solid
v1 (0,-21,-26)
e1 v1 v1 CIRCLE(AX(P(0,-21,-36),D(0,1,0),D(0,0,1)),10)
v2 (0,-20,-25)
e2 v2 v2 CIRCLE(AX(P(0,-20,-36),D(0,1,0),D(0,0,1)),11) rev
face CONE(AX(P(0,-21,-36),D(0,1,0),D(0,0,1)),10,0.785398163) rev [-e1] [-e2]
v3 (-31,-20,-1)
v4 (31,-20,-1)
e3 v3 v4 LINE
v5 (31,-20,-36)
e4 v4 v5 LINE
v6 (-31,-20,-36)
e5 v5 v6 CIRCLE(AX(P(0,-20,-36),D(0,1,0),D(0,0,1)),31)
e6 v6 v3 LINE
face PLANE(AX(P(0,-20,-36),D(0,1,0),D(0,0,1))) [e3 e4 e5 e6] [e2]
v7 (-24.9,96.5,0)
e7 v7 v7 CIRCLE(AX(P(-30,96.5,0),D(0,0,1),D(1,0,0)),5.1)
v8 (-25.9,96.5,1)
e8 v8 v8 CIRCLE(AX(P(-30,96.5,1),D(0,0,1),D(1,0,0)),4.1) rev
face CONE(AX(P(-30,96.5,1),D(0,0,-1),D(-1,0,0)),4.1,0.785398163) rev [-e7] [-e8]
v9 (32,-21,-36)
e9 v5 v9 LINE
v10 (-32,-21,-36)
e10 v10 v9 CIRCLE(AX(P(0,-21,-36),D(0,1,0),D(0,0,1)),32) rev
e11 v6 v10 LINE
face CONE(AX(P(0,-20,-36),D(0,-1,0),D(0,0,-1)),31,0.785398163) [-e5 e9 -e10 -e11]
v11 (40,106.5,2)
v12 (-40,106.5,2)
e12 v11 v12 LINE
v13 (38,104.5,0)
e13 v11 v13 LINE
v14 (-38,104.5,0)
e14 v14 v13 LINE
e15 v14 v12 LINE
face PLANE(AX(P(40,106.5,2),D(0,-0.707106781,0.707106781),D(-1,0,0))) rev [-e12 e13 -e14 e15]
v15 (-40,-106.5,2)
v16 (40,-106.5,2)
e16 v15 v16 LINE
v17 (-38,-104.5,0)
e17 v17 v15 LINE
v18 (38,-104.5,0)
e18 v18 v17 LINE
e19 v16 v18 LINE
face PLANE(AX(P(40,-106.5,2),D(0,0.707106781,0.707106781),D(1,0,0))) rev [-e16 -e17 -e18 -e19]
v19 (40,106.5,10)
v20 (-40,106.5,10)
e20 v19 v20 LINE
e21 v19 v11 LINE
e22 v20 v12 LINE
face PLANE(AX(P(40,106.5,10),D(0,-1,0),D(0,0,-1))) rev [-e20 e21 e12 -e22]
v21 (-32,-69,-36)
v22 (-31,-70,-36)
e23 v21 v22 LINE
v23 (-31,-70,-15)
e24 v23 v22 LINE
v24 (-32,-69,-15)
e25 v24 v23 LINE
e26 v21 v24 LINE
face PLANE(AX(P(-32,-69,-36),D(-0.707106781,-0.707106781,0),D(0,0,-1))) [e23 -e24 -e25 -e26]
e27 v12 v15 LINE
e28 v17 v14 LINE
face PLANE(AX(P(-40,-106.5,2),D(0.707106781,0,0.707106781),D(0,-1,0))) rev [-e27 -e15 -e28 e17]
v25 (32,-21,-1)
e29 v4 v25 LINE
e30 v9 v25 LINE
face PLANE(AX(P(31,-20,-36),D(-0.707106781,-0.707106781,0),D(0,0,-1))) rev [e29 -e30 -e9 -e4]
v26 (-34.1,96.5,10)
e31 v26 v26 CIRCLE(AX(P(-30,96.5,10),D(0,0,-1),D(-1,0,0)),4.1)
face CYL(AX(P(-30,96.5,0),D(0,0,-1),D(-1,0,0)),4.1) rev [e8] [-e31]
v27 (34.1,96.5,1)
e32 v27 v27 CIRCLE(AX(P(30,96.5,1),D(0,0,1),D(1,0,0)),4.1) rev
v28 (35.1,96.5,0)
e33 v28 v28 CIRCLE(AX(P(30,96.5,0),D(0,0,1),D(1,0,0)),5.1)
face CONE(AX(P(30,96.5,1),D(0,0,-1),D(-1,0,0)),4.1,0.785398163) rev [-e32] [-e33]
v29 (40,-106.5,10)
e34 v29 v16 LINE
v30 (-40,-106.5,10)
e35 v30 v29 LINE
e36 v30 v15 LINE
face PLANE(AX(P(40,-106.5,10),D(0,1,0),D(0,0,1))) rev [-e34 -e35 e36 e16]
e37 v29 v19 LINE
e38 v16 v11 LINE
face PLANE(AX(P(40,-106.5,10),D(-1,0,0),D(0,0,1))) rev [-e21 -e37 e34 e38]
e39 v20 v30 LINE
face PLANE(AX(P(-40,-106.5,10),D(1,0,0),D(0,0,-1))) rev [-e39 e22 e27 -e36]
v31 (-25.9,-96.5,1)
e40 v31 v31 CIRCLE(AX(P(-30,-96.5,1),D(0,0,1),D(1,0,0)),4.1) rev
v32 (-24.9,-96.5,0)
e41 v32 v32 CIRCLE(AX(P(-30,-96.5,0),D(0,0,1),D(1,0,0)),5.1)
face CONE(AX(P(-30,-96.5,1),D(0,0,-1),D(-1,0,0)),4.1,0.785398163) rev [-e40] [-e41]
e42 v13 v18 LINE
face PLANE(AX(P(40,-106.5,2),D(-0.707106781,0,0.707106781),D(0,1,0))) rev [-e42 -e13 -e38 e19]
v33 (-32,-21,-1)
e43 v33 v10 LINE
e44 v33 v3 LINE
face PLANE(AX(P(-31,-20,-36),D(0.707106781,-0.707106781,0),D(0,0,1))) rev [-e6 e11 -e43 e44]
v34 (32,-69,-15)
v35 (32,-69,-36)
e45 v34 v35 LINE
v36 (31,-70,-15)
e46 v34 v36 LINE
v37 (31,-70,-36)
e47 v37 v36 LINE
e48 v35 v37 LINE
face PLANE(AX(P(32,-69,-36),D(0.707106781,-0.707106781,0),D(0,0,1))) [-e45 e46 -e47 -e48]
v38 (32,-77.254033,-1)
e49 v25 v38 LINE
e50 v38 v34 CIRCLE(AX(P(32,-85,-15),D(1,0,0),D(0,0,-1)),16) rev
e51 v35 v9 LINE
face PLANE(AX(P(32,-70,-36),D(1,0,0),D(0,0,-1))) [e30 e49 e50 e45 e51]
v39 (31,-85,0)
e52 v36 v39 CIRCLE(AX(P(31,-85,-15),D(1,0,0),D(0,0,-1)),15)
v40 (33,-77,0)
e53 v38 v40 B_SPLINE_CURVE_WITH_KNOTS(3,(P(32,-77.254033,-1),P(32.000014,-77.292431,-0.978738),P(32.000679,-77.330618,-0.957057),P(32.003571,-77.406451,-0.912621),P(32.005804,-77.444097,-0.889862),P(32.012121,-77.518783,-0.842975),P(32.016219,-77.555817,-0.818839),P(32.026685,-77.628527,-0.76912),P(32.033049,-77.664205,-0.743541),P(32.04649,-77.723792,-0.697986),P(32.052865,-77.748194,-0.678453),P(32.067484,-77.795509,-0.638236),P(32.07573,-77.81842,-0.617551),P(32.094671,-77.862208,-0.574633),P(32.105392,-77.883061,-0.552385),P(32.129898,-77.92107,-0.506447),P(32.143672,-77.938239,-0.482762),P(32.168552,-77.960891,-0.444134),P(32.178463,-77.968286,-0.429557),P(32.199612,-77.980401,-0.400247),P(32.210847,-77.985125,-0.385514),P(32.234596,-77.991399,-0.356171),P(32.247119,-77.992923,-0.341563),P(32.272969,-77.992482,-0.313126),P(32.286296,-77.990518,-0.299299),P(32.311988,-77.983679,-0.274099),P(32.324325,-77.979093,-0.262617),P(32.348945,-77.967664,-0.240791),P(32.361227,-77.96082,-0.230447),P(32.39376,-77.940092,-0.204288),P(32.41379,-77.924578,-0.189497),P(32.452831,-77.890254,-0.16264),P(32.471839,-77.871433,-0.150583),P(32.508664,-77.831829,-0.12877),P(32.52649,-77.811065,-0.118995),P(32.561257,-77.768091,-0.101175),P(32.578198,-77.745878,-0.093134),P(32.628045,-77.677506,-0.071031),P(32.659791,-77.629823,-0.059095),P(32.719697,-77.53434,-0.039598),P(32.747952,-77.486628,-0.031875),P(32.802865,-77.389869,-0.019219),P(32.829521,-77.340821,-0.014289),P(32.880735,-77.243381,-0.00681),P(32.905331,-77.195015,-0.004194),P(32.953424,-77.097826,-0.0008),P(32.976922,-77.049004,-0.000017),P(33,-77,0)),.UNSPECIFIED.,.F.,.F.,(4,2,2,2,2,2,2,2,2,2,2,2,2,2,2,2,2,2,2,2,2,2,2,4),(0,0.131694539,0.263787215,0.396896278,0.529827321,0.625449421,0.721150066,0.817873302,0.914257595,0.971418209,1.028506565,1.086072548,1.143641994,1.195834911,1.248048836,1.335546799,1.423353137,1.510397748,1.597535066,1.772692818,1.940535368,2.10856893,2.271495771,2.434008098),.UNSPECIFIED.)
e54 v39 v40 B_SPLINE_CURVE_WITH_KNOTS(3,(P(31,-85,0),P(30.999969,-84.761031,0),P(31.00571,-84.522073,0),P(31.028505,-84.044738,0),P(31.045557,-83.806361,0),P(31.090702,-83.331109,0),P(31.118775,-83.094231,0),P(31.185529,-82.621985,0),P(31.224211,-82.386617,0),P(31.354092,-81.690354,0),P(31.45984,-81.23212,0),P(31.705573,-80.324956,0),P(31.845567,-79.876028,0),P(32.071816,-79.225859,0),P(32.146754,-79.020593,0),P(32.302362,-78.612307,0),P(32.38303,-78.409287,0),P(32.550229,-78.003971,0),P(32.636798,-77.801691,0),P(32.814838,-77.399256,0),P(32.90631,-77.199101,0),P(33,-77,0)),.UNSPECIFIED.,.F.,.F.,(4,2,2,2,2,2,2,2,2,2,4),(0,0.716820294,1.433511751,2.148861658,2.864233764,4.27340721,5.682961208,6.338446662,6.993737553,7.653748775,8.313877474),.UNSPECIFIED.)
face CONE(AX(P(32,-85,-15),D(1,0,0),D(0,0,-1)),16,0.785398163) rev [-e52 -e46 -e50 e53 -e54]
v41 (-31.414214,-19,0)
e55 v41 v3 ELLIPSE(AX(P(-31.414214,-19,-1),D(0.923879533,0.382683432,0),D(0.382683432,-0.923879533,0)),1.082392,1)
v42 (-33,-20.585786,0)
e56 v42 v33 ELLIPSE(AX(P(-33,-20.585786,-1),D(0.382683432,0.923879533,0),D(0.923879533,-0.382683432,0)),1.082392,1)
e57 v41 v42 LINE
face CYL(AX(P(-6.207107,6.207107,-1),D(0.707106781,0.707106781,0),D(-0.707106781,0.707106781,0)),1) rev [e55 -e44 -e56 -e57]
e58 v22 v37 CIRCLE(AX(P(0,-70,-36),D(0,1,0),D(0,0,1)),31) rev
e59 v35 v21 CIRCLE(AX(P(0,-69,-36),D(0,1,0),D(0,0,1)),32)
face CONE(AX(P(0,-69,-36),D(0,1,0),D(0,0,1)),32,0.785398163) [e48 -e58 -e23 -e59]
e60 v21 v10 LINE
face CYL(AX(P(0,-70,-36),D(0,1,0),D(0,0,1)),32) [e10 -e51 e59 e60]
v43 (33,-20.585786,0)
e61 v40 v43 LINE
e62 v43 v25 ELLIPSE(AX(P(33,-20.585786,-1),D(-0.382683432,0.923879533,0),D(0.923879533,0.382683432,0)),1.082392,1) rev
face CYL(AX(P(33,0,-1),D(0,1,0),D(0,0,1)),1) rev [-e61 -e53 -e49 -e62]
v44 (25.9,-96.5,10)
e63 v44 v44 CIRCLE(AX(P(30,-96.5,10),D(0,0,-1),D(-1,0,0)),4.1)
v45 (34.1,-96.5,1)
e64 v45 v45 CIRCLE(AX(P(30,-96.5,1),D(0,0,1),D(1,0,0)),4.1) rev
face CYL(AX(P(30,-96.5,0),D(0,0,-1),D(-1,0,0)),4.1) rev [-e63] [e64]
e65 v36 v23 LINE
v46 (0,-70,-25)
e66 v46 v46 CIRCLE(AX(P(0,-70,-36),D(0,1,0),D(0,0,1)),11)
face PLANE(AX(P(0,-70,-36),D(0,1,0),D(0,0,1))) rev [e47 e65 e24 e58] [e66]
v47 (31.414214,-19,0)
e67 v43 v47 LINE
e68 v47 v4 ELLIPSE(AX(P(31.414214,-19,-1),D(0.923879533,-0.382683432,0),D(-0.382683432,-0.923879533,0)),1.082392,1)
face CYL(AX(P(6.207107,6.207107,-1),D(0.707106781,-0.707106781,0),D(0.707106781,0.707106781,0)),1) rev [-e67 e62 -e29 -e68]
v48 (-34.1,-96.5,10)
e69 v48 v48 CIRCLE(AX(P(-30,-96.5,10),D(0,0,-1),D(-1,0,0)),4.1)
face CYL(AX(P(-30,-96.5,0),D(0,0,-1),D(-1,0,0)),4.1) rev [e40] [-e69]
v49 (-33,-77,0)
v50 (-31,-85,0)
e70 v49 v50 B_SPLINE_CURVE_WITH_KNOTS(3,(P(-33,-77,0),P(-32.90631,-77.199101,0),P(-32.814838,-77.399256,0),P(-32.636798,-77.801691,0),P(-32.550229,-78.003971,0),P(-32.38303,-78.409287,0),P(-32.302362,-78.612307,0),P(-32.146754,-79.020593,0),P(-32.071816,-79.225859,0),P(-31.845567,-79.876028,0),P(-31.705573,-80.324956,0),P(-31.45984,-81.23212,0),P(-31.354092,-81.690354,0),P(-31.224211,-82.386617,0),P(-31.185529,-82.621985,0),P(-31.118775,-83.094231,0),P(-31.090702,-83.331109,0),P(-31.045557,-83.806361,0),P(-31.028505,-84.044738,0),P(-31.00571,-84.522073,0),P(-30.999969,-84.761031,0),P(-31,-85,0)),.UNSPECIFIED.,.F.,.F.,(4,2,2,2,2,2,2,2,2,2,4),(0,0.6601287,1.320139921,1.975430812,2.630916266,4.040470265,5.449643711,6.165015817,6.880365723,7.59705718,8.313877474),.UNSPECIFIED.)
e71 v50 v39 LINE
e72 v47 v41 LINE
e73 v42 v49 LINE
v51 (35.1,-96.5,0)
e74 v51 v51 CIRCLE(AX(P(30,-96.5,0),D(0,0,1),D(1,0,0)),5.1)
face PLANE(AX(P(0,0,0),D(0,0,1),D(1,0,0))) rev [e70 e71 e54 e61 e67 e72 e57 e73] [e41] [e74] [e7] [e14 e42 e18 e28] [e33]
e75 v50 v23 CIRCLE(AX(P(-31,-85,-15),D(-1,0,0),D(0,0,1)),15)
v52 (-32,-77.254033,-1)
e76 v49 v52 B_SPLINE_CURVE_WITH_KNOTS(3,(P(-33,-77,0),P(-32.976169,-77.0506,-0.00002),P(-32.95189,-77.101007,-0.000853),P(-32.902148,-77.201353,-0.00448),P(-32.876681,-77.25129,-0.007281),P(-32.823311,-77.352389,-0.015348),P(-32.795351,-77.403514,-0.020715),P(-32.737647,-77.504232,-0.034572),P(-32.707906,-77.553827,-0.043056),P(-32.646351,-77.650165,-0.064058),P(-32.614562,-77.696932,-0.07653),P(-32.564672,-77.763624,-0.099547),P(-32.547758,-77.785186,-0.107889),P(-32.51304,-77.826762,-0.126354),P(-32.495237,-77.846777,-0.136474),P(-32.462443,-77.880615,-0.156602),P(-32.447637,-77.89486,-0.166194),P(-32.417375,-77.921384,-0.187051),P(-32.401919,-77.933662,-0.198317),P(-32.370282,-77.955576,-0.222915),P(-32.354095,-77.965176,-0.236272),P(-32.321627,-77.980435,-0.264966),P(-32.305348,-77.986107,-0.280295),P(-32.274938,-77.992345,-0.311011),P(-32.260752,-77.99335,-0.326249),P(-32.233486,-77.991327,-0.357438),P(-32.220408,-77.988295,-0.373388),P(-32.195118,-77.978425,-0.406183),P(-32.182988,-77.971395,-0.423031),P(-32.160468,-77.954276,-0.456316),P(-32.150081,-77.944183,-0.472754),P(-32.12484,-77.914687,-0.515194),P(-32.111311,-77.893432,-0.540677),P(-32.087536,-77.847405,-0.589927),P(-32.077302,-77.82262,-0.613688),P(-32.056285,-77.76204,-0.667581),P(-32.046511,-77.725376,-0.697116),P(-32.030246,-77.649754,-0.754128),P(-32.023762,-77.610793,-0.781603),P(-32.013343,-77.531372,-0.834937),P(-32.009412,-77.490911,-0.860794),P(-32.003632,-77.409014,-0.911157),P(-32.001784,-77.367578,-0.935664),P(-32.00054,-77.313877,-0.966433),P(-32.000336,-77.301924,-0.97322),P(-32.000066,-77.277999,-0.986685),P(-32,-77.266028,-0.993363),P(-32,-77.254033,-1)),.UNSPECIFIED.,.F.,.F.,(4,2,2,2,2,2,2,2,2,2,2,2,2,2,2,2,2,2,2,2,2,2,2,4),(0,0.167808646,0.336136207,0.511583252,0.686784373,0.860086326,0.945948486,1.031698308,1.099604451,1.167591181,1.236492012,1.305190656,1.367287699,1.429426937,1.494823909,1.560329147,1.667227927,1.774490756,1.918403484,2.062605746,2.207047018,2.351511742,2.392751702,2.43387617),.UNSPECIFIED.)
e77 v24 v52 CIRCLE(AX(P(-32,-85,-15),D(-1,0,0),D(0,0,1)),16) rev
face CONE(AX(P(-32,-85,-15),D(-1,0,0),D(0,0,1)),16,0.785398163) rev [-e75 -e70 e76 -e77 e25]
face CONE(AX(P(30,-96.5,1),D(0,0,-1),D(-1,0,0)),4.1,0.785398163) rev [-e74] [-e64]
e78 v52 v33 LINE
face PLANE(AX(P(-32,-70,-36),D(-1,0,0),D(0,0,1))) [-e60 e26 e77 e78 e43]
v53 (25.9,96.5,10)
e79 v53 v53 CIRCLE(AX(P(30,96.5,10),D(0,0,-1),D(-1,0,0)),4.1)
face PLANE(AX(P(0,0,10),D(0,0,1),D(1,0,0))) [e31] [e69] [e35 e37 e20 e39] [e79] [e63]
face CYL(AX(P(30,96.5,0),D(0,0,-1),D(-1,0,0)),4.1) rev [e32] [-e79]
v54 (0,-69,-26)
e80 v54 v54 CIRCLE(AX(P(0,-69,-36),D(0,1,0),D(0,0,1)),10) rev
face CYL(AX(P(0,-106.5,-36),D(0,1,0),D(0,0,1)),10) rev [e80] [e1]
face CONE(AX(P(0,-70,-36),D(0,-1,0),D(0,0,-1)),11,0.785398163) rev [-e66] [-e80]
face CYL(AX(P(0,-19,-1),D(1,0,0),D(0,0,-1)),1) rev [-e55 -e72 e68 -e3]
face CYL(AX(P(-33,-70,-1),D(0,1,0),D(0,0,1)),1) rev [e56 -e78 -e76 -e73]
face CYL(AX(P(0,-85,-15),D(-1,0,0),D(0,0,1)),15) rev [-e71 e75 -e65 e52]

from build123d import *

# Parameters (mm, degrees)
SKETCH1_W                  = 80
SKETCH1_H                  = 213
BOSS_EXTRUDE1_DEPTH        = 10
BOSS_EXTRUDE2_START        = -20
BOSS_EXTRUDE2_DEPTH        = 50
FILLET1_R                  = 15
SKETCH3_R                  = 10
CUT_EXTRUDE1_DEPTH         = 150.084707465
CHAMFER1_SIZE              = 1
F_8_2_8_2_DIAMETER_HOLE1_D = 8.2
CHAMFER2_SIZE              = 2
CHAMFER3_SIZE              = 1
FILLET2_R                  = 1


with BuildPart() as part:
    # Sketch1 → Boss-Extrude1 (new body)
    with BuildSketch(Plane.XY):
        Rectangle(SKETCH1_W, SKETCH1_H)
    extrude(amount=BOSS_EXTRUDE1_DEPTH)

    # Sketch2 → Boss-Extrude2 (add)
    with BuildSketch(Plane(origin=(0, 0, 0), x_dir=(1, 0, 0), z_dir=(0, 1, 0)).offset(BOSS_EXTRUDE2_START)):
        with BuildLine():
            Line((-32, 36), (-32, 0))
            Line((-32, 0), (32, 0))
            Line((32, 0), (32, 36))
            ThreePointArc((32, 36), (0, 68), (-32, 36))
        make_face()
    extrude(amount=-BOSS_EXTRUDE2_DEPTH)

    # Fillet1
    fillet1_edges = [part.edges().sort_by_distance(p)[0] for p in [
        (0, -70, 0),
    ]]
    fillet(fillet1_edges, radius=FILLET1_R)

    # Sketch3 → Cut-Extrude1 (cut, through all)
    with BuildSketch(Plane(origin=(0, -20, 0), x_dir=(1, 0, 0), z_dir=(0, 1, 0))):
        with Locations(Location((0, 36, 0), (0, 0, 270))):
            Circle(SKETCH3_R)
    extrude(amount=-CUT_EXTRUDE1_DEPTH, mode=Mode.SUBTRACT)

    # Chamfer1
    # the kernel refuses this chamfer: 1 mm, written as the material it takes off along each edge
    with BuildSketch(Plane(origin=(0, -70, -36), x_dir=(1, 0, 0), z_dir=(0, 0, 1))) as chamfer1_piece_1:
        Polygon((32 - CHAMFER1_SIZE, 0), (32, CHAMFER1_SIZE), (32, 0), align=None)
    revolve(axis=Axis((0, -70, -36), (0, 1, 0)), revolution_arc=180, mode=Mode.SUBTRACT)
    with BuildSketch(Plane(origin=(-32, -70, -36), x_dir=(-0.027495876610589196, 0.9996219169112968, 0), z_dir=(0, 0, 1)), Plane(origin=(32, -70, -15), x_dir=(0.027495876610589196, 0.9996219169112968, 0), z_dir=(0, 0, -1))) as chamfer1_piece_2:
        Polygon((CHAMFER1_SIZE * 0.999621916911, -CHAMFER1_SIZE * 0.0274958766106), (-CHAMFER1_SIZE * 0.0274958766106, -CHAMFER1_SIZE * 0.999621916911), (0, 0), align=None)
    extrude(amount=21, mode=Mode.SUBTRACT)
    with BuildSketch(Plane(origin=(0, -20, -36), x_dir=(1, 0, 0), z_dir=(0, 0, 1))) as chamfer1_piece_3:
        Polygon((32 - CHAMFER1_SIZE, 0), (32, -CHAMFER1_SIZE), (32, 0), align=None)
    revolve(axis=Axis((0, -20, -36), (0, 1, 0)), revolution_arc=180, mode=Mode.SUBTRACT)
    with BuildSketch(Plane(origin=(-32, -20, -36), x_dir=(-0.0274958766105891, -0.9996219169112968, 0), z_dir=(0, 0, 1)), Plane(origin=(32, -20, 0), x_dir=(0.0274958766105891, -0.9996219169112968, 0), z_dir=(0, 0, -1))) as chamfer1_piece_4:
        Polygon((CHAMFER1_SIZE * 0.999621916911, CHAMFER1_SIZE * 0.0274958766106), (-CHAMFER1_SIZE * 0.0274958766106, CHAMFER1_SIZE * 0.999621916911), (0, 0), align=None)
    extrude(amount=36, mode=Mode.SUBTRACT)
    with BuildSketch(Plane(origin=(32, -85, -15), x_dir=(0, -0.17067472761230248, 0.9853274264702401), z_dir=(0, -0.9853274264702401, -0.17067472761230248))) as chamfer1_piece_5_section:
        Polygon((15, CHAMFER1_SIZE), (15 + CHAMFER1_SIZE, 0), (15, 0), align=None)
    chamfer1_piece_5 = revolve(axis=Axis((32, -85, -15), (-1, 0, 0)), revolution_arc=99.827051452, mode=Mode.PRIVATE)
    chamfer1_piece_5 = split(chamfer1_piece_5, bisect_by=Plane(origin=(31.514748262, -74.050273487, 0), z_dir=(0, 0, -1)), keep=Keep.TOP, mode=Mode.PRIVATE)
    add(chamfer1_piece_5, mode=Mode.SUBTRACT)
    with BuildSketch(Plane(origin=(-32, -85, -15), x_dir=(0, -0.17067472761230248, 0.9853274264702401), z_dir=(0, -0.9853274264702401, -0.17067472761230248))) as chamfer1_piece_6_section:
        Polygon((15 + CHAMFER1_SIZE, 0), (15, -CHAMFER1_SIZE), (15, 0), align=None)
    chamfer1_piece_6 = revolve(axis=Axis((-32, -85, -15), (-1, 0, 0)), revolution_arc=99.827051452, mode=Mode.PRIVATE)
    chamfer1_piece_6 = split(chamfer1_piece_6, bisect_by=Plane(origin=(-31.514748262, -74.050273487, 0), z_dir=(0, 0, -1)), keep=Keep.TOP, mode=Mode.PRIVATE)
    add(chamfer1_piece_6, mode=Mode.SUBTRACT)

    # Ø8.2 (8.2) Diameter Hole1 (through all)
    with Locations(Plane(origin=(0, 0, 0), x_dir=(-1, 0, 0), z_dir=(0, 0, -1))):
        with Locations((30, -96.5), (-30, 96.5), (-30, -96.5), (30, 96.5)):
            Hole(F_8_2_8_2_DIAMETER_HOLE1_D / 2)

    # Chamfer2
    chamfer2_edges = [part.edges().sort_by_distance(p)[0] for p in [
        (0, 106.5, 0),
        (40, 0, 0),
        (0, -106.5, 0),
        (-40, 0, 0),
    ]]
    chamfer(chamfer2_edges, length=CHAMFER2_SIZE)

    # Chamfer3
    chamfer3_edges = [part.edges().sort_by_distance(p)[0] for p in [
        (25.9, -96.5, 0),
        (25.9, 96.5, 0),
        (-34.1, -96.5, 0),
        (0, -70, -46),
        (0, -20, -46),
        (-34.1, 96.5, 0),
    ]]
    chamfer(chamfer3_edges, length=CHAMFER3_SIZE)

    # Fillet2
    fillet2_edges = [part.edges().sort_by_distance(p)[0] for p in [
        (-32, -50.216117819, 0),
        (32, -50.216117819, 0),
        (0, -20, 0),
        (-31.5, -20.5, 0),
        (31.5, -20.5, 0),
    ]]
    fillet(fillet2_edges, radius=FILLET2_R)


solid = part.part
